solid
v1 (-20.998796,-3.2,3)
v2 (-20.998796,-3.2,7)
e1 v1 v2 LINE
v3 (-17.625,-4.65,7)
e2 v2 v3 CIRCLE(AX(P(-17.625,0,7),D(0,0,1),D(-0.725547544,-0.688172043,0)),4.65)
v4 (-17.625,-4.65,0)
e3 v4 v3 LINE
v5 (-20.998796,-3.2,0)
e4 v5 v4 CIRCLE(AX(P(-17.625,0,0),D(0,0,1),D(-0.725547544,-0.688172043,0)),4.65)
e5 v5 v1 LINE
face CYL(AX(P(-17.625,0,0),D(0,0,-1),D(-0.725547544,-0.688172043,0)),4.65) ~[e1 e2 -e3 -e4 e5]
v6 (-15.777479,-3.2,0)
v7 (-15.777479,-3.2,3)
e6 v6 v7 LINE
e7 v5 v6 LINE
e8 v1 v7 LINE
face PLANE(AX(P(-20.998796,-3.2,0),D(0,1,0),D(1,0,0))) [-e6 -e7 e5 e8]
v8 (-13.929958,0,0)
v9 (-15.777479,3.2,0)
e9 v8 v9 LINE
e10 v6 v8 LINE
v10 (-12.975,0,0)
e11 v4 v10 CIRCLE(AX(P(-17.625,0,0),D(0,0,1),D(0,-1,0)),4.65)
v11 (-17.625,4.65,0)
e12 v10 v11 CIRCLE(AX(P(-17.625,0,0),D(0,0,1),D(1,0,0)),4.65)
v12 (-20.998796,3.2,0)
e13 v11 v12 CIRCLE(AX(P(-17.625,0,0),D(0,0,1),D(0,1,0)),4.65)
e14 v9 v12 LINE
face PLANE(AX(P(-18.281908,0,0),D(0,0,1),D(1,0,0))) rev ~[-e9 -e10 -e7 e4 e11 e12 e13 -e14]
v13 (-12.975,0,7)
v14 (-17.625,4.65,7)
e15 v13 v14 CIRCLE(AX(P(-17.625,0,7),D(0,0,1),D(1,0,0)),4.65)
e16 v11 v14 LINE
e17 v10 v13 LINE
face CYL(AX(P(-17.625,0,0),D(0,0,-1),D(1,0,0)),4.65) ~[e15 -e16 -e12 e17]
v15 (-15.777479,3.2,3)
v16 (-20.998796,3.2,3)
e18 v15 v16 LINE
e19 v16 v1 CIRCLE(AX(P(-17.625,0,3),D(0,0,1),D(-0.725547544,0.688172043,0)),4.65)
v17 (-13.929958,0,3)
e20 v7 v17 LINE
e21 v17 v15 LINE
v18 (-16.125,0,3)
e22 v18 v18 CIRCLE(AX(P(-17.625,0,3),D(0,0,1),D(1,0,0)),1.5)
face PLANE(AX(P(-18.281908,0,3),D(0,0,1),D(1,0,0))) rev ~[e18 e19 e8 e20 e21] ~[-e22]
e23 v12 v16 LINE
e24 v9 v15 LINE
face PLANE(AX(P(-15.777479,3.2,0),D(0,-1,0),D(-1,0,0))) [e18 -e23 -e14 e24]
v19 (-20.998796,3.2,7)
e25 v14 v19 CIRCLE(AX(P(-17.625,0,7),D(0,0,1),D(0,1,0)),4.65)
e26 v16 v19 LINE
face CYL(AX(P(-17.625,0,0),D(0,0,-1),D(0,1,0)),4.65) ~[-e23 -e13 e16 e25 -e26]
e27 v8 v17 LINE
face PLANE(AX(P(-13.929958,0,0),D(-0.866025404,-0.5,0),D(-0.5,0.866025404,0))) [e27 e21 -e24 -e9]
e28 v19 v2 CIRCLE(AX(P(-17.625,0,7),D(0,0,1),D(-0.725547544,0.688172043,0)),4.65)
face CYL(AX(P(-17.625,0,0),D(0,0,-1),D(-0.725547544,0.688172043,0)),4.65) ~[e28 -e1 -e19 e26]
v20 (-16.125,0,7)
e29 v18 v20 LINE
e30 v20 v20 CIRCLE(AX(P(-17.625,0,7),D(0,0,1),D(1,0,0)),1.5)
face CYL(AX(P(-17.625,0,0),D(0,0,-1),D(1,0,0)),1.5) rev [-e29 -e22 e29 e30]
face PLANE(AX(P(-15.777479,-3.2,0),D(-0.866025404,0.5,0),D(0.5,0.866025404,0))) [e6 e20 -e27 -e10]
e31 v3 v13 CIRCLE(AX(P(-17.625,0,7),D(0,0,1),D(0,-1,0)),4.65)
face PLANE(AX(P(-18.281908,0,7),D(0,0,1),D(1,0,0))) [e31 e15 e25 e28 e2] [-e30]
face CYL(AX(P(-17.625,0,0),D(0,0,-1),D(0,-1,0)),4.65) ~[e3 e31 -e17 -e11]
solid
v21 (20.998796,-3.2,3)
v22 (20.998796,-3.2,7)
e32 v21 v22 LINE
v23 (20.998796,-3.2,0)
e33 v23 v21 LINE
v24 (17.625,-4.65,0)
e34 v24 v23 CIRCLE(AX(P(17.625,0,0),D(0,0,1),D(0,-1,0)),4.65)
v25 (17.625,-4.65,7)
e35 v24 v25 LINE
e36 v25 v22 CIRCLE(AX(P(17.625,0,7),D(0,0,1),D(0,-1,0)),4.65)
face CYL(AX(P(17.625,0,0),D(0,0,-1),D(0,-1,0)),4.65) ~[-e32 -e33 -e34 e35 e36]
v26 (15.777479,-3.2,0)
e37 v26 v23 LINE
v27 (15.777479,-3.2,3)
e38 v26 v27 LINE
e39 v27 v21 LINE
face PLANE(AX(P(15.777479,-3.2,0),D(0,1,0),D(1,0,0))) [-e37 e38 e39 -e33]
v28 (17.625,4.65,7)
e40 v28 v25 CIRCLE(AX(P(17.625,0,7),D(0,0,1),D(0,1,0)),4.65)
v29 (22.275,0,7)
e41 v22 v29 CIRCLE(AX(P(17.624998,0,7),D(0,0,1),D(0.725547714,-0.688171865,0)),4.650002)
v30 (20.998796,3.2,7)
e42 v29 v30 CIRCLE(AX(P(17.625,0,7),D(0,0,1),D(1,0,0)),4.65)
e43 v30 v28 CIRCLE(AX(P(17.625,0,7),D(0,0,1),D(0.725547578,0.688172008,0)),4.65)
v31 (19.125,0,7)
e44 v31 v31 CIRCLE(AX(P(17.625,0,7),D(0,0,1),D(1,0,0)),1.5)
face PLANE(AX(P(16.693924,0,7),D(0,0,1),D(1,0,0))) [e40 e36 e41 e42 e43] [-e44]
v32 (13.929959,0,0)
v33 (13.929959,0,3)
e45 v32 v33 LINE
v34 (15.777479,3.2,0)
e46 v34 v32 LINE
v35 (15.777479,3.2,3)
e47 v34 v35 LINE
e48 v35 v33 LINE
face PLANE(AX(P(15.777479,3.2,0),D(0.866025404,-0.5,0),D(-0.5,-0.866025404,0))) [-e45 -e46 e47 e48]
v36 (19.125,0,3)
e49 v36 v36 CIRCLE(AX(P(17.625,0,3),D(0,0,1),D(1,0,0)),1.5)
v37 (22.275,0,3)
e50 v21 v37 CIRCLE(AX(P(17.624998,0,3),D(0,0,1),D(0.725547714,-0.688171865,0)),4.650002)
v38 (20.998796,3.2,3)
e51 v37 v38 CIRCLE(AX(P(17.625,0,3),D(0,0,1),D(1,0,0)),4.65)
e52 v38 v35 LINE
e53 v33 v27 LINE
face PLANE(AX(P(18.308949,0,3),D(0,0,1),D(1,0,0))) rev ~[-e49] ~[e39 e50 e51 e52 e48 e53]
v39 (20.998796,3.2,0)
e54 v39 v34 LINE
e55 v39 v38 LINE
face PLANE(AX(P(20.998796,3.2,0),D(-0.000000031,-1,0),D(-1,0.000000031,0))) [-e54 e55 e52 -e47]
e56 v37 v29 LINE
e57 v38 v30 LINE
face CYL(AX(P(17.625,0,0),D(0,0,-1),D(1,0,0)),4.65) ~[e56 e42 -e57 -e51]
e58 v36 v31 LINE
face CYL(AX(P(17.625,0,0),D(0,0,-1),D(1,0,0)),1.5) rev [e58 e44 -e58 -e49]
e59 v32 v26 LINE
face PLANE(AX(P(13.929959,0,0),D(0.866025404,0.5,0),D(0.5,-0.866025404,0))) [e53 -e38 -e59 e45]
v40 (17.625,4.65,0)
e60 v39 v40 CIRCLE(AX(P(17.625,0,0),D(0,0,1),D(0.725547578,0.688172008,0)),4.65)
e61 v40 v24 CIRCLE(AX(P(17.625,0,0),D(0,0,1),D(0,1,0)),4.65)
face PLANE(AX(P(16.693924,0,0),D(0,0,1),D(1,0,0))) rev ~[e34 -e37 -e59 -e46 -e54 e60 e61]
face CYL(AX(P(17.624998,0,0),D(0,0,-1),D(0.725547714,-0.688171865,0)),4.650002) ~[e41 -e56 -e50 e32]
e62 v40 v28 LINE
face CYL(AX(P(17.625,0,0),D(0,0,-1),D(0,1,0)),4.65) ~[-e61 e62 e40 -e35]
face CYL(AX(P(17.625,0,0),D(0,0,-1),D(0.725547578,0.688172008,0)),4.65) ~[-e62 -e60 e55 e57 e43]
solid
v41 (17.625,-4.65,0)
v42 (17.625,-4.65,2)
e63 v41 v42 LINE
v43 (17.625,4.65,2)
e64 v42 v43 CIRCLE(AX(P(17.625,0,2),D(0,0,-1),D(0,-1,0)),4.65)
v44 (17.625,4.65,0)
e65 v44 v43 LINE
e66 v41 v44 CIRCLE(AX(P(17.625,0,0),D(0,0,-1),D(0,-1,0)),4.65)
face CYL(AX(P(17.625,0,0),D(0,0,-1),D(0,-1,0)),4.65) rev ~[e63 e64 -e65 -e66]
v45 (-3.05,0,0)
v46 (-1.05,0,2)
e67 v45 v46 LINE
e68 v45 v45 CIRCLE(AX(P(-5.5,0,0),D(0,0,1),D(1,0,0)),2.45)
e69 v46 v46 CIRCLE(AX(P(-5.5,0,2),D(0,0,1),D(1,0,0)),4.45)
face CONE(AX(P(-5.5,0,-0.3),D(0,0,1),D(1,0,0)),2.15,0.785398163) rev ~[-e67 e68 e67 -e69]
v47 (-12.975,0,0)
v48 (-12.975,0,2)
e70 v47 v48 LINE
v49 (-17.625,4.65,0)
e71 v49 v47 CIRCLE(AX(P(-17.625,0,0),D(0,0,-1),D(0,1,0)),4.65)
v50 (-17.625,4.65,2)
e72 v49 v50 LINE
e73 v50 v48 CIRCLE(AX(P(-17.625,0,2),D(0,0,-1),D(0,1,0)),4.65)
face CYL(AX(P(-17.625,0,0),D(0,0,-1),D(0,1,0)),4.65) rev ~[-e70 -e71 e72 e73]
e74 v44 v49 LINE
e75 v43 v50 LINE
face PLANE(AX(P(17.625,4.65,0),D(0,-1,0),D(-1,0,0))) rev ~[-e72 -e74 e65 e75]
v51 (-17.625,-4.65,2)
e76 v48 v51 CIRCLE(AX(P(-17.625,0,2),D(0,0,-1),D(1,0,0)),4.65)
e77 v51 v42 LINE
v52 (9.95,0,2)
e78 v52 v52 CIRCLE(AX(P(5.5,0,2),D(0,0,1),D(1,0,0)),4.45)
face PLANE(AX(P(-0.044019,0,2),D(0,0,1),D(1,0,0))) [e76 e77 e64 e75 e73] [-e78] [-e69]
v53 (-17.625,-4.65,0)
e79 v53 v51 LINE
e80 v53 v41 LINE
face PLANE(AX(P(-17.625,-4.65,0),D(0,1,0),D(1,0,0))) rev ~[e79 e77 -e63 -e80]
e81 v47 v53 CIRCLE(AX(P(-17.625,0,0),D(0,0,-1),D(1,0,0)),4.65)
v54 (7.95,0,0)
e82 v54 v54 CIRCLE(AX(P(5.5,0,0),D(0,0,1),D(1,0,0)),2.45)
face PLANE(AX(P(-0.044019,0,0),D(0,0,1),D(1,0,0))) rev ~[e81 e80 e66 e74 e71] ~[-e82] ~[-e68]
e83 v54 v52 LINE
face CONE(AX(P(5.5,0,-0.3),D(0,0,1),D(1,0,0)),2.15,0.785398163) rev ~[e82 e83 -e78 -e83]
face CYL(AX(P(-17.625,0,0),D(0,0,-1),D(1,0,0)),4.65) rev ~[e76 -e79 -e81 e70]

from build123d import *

# Parameters (mm, degrees)
F0_R     = 1.5
F1_DEPTH = 7
F0_R_2   = 2.15
F2_DEPTH = 2
F4_DEPTH = 3


# Not quite as in the source:
# - a fillet or chamfer that OpenCascade refuses, or shapes differently, is made with other operations: its cross-section is extruded or revolved along the edge and cut away or added
# - ends of sketch curves that miss each other by under 0.0002 mm in the source are joined
# - a feature names something its author has since deleted; it is built from what else it names


with BuildPart() as f1:
    # F0 (on Top) → F1 (new body)
    with BuildSketch(Plane.XY):
        with BuildLine():
            Line((-15.7774791386, 3.2), (-20.9987960816, 3.2))
            ThreePointArc((-20.9987960816, 3.2), (-22.275, 0), (-20.9987960816, -3.2))
            Line((-20.9987960816, -3.2), (-15.7774791386, -3.2))
            Line((-15.7774791386, -3.2), (-13.9299582772, 0))
            Line((-13.9299582772, 0), (-15.7774791386, 3.2))
        make_face()
        with Locations((-17.625, 0)):
            Circle(F0_R, mode=Mode.SUBTRACT)
        with BuildLine():
            ThreePointArc((-17.625, -4.65), (-14.3369534675, -3.2880465325), (-12.975, 0))
            ThreePointArc((-12.975, 0), (-14.3369534675, 3.2880465325), (-17.625, 4.65))
            ThreePointArc((-17.625, 4.65), (-19.4610964027, 4.2721481716), (-20.9987960816, 3.2))
            Line((-20.9987960816, 3.2), (-15.7774791386, 3.2))
            Line((-15.7774791386, 3.2), (-13.9299582772, 0))
            Line((-13.9299582772, 0), (-15.7774791386, -3.2))
            Line((-15.7774791386, -3.2), (-20.9987960816, -3.2))
            ThreePointArc((-20.9987960816, -3.2), (-19.4610964027, -4.2721481716), (-17.625, -4.65))
        make_face()
    extrude(amount=F1_DEPTH)


with BuildPart() as f1b:
    # F0 (on Top) → F1, piece 2 (new body)
    with BuildSketch(Plane.XY):
        with BuildLine():
            ThreePointArc((20.9987962368, 3.1999998363), (19.4610965063, 4.272148127), (17.625, 4.65))
            ThreePointArc((17.625, 4.65), (12.975, 0), (17.625, -4.65))
            ThreePointArc((17.625, -4.65), (19.4610965063, -4.272148127), (20.9987962368, -3.1999998363))
            Line((20.9987962368, -3.1999998363), (15.7774794664, -3.2))
            Line((15.7774794664, -3.2), (13.929958605, 0))
            Line((13.929958605, 0), (15.7774794664, 3.2))
            Line((15.7774794664, 3.2), (20.9987962368, 3.1999998363))
        make_face()
        with BuildLine():
            ThreePointArc((22.275, 0), (21.9441812014, 1.7225486203), (20.9987962368, 3.1999998363))
            Line((20.9987962368, 3.1999998363), (15.7774794664, 3.2))
            Line((15.7774794664, 3.2), (13.929958605, 0))
            Line((13.929958605, 0), (15.7774794664, -3.2))
            Line((15.7774794664, -3.2), (20.9987964094, -3.2))
            ThreePointArc((20.9987964094, -3.2), (21.9441812014, -1.7225486203), (22.275, 0))
        make_face()
        with Locations((17.625, 0)):
            Circle(F0_R, mode=Mode.SUBTRACT)
    extrude(amount=F1_DEPTH)


with BuildPart() as f2:
    # F0 (on Top) → F2 (new body)
    with BuildSketch(Plane.XY):
        with BuildLine():
            ThreePointArc((-17.625, 4.65), (-14.3369534675, 3.2880465325), (-12.975, 0))
            ThreePointArc((-12.975, 0), (-14.3369534675, -3.2880465325), (-17.625, -4.65))
            Line((-17.625, -4.65), (17.625, -4.65))
            ThreePointArc((17.625, -4.65), (12.975, 0), (17.625, 4.65))
            Line((17.625, 4.65), (-17.625, 4.65))
        make_face()
        with Locations((-5.5, 0)):
            Circle(F0_R_2, mode=Mode.SUBTRACT)
        with Locations((5.5, 0)):
            Circle(F0_R_2, mode=Mode.SUBTRACT)
    extrude(amount=F2_DEPTH)

    # F3: chamfer of 2.3 on 2 edges, made by hand

    # F3_s1 → F3_t2 (revolve, cut)
    with BuildSketch(Plane.XZ):
        Polygon((-3.35, -0.3), (-1.05, 2), (-3.35, 2), align=None)
    revolve(axis=Axis((-5.5, 0, 2), (0, 0, 1)), mode=Mode.SUBTRACT)

    # F3_s3 → F3_t4 (revolve, cut)
    with BuildSketch(Plane.XZ):
        Polygon((7.65, -0.3), (9.95, 2), (7.65, 2), align=None)
    revolve(axis=Axis((5.5, 0, 2), (0, 0, 1)), mode=Mode.SUBTRACT)


with BuildPart() as f4_tool:
    # F0 (on Top) → F4 (new body)
    with BuildSketch(Plane.XY):
        with BuildLine():
            Line((-15.7774791386, 3.2), (-20.9987960816, 3.2))
            ThreePointArc((-20.9987960816, 3.2), (-22.275, 0), (-20.9987960816, -3.2))
            Line((-20.9987960816, -3.2), (-15.7774791386, -3.2))
            Line((-15.7774791386, -3.2), (-13.9299582772, 0))
            Line((-13.9299582772, 0), (-15.7774791386, 3.2))
        make_face()
        with Locations((-17.625, 0)):
            Circle(F0_R, mode=Mode.SUBTRACT)
        with BuildLine():
            ThreePointArc((22.275, 0), (21.9441812014, 1.7225486203), (20.9987962368, 3.1999998363))
            Line((20.9987962368, 3.1999998363), (15.7774794664, 3.2))
            Line((15.7774794664, 3.2), (13.929958605, 0))
            Line((13.929958605, 0), (15.7774794664, -3.2))
            Line((15.7774794664, -3.2), (20.9987964094, -3.2))
            ThreePointArc((20.9987964094, -3.2), (21.9441812014, -1.7225486203), (22.275, 0))
        make_face()
        with Locations((17.625, 0)):
            Circle(F0_R, mode=Mode.SUBTRACT)
    extrude(amount=F4_DEPTH)


with BuildPart() as f1_1:
    add(f1.part)

    # F4: cut by f4_tool
    add(f4_tool.part, mode=Mode.SUBTRACT)


with BuildPart() as f1b_1:
    add(f1b.part)

    # F4: cut by f4_tool
    add(f4_tool.part, mode=Mode.SUBTRACT)


solid = Compound([f2.part, f1_1.part, f1b_1.part])
